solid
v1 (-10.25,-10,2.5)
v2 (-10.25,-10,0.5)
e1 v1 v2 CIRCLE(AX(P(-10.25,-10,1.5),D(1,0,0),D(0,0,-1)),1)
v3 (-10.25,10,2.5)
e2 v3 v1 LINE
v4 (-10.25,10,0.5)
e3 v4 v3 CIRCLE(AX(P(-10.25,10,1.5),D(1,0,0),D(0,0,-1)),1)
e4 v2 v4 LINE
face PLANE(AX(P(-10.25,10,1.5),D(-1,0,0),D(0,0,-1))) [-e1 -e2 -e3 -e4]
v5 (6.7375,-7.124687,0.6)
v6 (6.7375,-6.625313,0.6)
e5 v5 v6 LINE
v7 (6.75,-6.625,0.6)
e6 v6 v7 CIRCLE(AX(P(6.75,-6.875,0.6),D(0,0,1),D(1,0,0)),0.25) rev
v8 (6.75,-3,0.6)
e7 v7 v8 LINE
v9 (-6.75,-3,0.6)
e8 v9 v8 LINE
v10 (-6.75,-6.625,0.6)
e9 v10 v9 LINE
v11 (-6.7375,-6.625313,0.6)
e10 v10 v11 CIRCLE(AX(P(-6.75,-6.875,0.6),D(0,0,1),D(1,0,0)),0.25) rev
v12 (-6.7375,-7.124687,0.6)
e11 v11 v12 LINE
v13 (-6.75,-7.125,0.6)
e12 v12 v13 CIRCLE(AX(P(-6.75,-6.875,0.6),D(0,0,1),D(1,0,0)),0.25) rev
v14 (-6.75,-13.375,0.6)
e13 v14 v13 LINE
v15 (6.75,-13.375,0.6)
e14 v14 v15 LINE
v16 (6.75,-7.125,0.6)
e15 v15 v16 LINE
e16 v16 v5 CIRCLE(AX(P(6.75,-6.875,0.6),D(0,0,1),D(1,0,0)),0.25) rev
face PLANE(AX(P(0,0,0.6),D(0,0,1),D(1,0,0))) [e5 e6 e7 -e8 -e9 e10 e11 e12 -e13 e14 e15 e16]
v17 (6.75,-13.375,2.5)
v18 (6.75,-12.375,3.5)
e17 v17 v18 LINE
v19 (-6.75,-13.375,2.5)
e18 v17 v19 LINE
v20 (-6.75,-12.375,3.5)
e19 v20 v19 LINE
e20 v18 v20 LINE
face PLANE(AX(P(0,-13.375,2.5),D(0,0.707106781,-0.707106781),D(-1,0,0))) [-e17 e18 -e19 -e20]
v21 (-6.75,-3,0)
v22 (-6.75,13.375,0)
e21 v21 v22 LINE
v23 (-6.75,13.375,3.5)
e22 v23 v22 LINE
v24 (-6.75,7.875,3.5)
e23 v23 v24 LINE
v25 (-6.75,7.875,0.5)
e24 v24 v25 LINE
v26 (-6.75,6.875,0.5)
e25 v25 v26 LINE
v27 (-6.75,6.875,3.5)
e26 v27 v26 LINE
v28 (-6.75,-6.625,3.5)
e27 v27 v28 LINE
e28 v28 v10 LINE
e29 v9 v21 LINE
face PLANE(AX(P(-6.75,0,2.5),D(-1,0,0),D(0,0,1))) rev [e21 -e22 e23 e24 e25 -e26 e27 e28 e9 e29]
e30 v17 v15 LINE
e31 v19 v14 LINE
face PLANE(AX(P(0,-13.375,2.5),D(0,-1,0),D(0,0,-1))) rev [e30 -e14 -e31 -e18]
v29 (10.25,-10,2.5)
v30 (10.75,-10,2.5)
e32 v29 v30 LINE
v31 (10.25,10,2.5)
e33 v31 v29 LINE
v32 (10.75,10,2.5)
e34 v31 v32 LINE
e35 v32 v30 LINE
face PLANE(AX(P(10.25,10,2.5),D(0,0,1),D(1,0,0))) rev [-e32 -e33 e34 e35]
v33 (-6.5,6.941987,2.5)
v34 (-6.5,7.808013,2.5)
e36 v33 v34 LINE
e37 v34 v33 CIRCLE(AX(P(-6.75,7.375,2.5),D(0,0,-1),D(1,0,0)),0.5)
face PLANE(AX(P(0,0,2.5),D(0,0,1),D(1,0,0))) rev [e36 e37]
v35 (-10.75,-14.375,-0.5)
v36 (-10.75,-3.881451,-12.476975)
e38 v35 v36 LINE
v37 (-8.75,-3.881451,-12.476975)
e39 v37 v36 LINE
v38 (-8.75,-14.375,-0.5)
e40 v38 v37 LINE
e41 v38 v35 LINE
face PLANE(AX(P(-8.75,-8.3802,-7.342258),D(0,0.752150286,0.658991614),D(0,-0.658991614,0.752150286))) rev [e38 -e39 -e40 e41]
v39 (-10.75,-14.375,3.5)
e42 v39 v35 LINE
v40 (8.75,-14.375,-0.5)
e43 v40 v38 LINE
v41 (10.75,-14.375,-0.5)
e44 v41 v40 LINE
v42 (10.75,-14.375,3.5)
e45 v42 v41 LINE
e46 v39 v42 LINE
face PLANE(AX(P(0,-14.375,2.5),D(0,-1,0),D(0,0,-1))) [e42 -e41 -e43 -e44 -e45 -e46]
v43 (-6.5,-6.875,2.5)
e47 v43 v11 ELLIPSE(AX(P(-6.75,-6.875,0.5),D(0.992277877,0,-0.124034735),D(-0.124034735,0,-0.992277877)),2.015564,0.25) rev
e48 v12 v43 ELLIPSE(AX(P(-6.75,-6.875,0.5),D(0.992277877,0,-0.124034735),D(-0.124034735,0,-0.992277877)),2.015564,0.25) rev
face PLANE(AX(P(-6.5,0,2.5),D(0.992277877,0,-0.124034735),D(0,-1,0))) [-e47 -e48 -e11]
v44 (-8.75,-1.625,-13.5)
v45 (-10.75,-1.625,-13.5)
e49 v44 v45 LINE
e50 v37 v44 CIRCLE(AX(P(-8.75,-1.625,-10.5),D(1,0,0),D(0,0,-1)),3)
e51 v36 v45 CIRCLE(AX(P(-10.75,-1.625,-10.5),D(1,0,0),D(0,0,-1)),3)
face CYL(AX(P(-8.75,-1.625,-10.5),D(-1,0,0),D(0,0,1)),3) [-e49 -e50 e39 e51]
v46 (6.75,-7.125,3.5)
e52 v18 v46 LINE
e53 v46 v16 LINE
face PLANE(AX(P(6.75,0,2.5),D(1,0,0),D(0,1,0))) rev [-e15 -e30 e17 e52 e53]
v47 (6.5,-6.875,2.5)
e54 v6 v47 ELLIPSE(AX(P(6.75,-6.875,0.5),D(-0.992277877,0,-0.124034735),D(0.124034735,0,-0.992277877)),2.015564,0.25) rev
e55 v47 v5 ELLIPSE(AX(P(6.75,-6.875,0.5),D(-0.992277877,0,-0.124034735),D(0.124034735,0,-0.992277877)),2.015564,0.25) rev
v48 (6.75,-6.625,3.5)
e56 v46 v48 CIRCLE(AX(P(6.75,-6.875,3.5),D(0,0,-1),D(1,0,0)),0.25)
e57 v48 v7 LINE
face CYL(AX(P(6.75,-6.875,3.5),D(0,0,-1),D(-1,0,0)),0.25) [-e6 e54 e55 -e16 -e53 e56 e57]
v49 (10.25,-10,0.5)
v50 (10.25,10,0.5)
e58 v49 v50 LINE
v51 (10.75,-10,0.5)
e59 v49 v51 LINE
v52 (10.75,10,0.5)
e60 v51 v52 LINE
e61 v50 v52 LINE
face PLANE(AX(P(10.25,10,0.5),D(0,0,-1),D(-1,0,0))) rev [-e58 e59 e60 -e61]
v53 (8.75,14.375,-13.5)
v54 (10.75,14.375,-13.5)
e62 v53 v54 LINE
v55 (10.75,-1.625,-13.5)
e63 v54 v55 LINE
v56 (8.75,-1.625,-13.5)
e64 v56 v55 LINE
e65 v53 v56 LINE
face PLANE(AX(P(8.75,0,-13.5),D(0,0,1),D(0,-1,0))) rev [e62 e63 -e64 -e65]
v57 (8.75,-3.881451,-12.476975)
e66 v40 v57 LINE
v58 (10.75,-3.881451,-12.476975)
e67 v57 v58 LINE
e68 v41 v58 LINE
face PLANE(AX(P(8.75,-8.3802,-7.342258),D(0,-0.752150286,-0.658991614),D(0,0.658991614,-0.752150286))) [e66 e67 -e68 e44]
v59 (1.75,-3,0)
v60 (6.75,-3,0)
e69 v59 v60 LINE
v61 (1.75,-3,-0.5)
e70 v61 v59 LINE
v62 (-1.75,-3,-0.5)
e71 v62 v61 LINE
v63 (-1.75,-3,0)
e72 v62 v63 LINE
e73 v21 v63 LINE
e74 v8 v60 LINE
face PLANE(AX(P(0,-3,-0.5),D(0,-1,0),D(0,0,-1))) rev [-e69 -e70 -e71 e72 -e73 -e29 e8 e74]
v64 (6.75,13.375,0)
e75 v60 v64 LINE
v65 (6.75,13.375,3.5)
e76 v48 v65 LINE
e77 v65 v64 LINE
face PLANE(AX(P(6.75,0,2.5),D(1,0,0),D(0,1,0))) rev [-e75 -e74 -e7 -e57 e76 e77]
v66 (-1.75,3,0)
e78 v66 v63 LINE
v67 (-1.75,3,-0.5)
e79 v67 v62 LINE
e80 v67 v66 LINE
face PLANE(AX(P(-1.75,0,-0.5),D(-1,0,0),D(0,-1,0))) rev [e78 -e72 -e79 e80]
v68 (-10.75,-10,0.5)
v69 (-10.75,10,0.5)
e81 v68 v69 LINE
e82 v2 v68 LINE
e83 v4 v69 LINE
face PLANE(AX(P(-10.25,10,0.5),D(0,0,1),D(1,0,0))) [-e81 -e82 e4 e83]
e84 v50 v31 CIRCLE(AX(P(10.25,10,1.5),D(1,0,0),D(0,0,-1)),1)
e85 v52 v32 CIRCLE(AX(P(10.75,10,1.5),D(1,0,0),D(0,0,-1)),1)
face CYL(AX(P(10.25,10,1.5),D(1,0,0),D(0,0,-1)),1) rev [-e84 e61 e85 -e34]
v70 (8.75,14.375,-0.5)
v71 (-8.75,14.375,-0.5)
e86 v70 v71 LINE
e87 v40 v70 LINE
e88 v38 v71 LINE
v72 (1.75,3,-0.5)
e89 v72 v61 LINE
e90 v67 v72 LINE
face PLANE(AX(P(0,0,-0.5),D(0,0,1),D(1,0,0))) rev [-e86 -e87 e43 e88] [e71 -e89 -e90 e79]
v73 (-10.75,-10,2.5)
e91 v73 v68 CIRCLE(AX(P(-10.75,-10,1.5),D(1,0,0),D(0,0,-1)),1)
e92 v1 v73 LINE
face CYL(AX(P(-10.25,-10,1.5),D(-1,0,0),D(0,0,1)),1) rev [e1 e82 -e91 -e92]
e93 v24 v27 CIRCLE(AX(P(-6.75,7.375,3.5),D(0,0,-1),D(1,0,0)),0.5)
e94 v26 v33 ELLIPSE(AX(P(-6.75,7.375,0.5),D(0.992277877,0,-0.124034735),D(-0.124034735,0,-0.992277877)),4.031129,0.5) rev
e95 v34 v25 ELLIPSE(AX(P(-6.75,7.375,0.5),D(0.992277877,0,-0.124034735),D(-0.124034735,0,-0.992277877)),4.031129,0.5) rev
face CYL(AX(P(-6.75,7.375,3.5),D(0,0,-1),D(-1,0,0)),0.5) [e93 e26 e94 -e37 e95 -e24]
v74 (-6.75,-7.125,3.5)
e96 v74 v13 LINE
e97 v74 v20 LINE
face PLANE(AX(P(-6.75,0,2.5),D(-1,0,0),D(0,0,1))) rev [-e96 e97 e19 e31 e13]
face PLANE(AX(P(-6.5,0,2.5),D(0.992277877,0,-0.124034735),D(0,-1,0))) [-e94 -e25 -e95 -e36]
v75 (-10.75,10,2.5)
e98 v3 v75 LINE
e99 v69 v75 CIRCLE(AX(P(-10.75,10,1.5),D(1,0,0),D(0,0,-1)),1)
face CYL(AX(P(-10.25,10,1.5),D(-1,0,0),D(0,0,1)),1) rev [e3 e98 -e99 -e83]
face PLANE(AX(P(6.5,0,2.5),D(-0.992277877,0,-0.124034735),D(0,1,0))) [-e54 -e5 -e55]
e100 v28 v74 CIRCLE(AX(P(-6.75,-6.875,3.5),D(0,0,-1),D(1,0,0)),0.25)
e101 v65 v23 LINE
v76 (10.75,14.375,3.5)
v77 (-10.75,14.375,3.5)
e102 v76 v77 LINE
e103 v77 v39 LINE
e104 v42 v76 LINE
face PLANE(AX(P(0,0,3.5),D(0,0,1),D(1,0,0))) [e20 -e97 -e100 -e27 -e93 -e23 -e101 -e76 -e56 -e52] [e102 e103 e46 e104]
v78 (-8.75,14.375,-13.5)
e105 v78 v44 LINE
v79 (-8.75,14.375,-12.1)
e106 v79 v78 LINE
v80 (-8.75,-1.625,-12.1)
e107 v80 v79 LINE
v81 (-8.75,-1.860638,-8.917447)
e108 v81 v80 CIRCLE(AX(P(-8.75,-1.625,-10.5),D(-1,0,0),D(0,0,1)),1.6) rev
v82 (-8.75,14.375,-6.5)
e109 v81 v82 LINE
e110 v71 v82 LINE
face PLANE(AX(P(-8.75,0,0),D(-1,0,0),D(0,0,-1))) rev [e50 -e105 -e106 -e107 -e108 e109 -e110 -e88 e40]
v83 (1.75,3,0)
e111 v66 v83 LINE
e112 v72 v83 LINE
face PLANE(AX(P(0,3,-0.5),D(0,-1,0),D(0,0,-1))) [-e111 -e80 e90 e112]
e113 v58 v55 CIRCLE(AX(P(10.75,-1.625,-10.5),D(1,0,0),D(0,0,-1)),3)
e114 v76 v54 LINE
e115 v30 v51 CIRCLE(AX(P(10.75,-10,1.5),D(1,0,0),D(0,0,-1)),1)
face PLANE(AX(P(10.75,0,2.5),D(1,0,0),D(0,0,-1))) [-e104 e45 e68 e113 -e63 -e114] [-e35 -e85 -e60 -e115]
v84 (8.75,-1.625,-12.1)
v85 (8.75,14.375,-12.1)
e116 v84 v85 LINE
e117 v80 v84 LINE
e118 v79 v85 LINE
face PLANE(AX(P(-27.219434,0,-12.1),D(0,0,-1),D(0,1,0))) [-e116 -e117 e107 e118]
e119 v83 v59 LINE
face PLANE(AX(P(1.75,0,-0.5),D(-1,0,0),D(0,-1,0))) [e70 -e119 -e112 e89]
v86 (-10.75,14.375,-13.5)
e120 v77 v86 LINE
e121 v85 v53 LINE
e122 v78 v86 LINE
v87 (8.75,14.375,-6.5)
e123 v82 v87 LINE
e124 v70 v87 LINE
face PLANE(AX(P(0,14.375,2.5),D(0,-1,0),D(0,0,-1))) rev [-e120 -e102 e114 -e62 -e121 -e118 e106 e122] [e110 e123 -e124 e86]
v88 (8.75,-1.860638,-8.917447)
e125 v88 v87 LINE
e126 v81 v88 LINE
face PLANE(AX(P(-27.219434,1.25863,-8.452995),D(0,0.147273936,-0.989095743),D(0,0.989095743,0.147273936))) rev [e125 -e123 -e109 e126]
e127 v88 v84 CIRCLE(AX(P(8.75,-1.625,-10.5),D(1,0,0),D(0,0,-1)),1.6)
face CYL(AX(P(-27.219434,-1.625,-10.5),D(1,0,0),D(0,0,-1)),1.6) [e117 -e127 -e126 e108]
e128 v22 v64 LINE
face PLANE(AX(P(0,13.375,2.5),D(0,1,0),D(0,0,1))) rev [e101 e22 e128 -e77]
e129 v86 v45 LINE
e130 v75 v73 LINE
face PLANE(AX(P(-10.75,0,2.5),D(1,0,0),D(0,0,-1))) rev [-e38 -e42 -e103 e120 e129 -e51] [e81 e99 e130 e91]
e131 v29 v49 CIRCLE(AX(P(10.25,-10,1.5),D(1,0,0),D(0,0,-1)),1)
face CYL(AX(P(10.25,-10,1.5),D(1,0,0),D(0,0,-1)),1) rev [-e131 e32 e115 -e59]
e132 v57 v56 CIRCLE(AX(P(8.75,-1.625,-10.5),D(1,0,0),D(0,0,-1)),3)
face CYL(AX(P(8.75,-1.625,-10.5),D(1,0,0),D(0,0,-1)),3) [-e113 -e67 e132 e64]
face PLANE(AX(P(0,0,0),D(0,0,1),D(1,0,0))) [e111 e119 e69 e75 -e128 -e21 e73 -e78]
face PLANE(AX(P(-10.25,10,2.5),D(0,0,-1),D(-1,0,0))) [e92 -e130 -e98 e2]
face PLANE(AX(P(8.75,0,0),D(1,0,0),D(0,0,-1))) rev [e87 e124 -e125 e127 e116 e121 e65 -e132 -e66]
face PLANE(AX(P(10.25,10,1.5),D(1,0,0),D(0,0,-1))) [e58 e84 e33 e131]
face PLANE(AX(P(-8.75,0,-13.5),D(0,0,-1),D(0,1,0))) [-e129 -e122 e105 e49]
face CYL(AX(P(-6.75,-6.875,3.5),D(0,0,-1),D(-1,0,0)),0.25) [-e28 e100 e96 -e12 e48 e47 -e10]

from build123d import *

# Parameters (mm, degrees)
BOSS_EXTRUDE2_DEPTH = 0.5
BOSS_EXTRUDE3_DEPTH = 0.6
SKETCH4_W           = 21.5
SKETCH4_H           = 28.75
SKETCH4_W_2         = 13.5
SKETCH4_H_2         = 26.75
BOSS_EXTRUDE4_DEPTH = 3
SKETCH5_W           = 21.5
SKETCH5_H           = 28.75
BOSS_EXTRUDE5_DEPTH = 1
CHAMFER1_SIZE       = 0.25
CHAMFER1_SIZE_2     = 2
CHAMFER2_SIZE       = 2
CUT_EXTRUDE3_DEPTH  = 0.5
BOSS_EXTRUDE6_DEPTH = 2
BOSS_EXTRUDE8_START = -2
BOSS_EXTRUDE8_DEPTH = 17.5


with BuildPart() as part:
    # Sketch2 → Boss-Extrude2 (new body)
    with BuildSketch(Plane.XY):
        Polygon((-6.75, 13.375), (-6.75, -3), (-1.75, -3), (-1.75, 3), (1.75, 3), (1.75, -3), (6.75, -3), (6.75, 13.375), align=None)
        Polygon((-6.75, -3), (-6.75, -13.375), (6.75, -13.375), (6.75, -3), (1.75, -3), (-1.75, -3), align=None)
    extrude(amount=-BOSS_EXTRUDE2_DEPTH)

    # Sketch2<5> → Boss-Extrude3 (add)
    with BuildSketch(Plane.XY):
        Polygon((-6.75, -3), (-6.75, -13.375), (6.75, -13.375), (6.75, -3), (1.75, -3), (-1.75, -3), align=None)
    extrude(amount=BOSS_EXTRUDE3_DEPTH)

    # Sketch4 → Boss-Extrude4 (add)
    with BuildSketch(Plane(origin=(0, 0, -0.5), x_dir=(-1, 0, 0), z_dir=(0, 0, -1))):
        Rectangle(SKETCH4_W, SKETCH4_H)
        Rectangle(SKETCH4_W_2, SKETCH4_H_2, mode=Mode.SUBTRACT)
    extrude(amount=-BOSS_EXTRUDE4_DEPTH)

    # Sketch5 → Boss-Extrude5 (add)
    with BuildSketch(Plane.XY.offset(2.5)):
        Rectangle(SKETCH5_W, SKETCH5_H)
        with BuildLine():
            Line((-6.75, -7.125), (-6.75, -11.375))
            Line((-6.75, -11.375), (6.75, -11.375))
            Line((6.75, -11.375), (6.75, -7.125))
            ThreePointArc((6.75, -7.125), (6.5, -6.875), (6.75, -6.625))
            Line((6.75, -6.625), (6.75, 13.375))
            Line((6.75, 13.375), (-6.75, 13.375))
            Line((-6.75, 13.375), (-6.75, 7.875))
            ThreePointArc((-6.75, 7.875), (-6.25, 7.375), (-6.75, 6.875))
            Line((-6.75, 6.875), (-6.75, -6.625))
            ThreePointArc((-6.75, -6.625), (-6.5, -6.875), (-6.75, -7.125))
        make_face(mode=Mode.SUBTRACT)
    extrude(amount=BOSS_EXTRUDE5_DEPTH)

    # Chamfer1
    # the kernel refuses this chamfer: 2, 0.25 mm, written as the material it adds along each edge
    with BuildSketch(Plane(origin=(6.75, -1.426485236, 2.5), x_dir=(-0.9563912737708581, 0, 0.29208856782653414), z_dir=(0, -1, 0))) as chamfer1_piece_1_section:
        Polygon((CHAMFER1_SIZE * 0.956391273771, CHAMFER1_SIZE * 0.292088567827), (-CHAMFER1_SIZE_2 * 0.292088567827, CHAMFER1_SIZE_2 * 0.956391273771), (0, 0), align=None)
    chamfer1_piece_1 = extrude(amount=10.897029528, mode=Mode.PRIVATE)
    chamfer1_piece_1 = chamfer1_piece_1 & Plane(origin=(6.75, -6.875, 1.806445447), x_dir=(0, -1, 0), z_dir=(0, 0, -1)) * Cylinder(0.25, 30, mode=Mode.PRIVATE)
    add(chamfer1_piece_1)
    with BuildSketch(Plane(origin=(-6.75, -12.323514764, 2.5), x_dir=(-0.0047719296843702665, 0, -0.9999886142787264), z_dir=(0, 1, 0))) as chamfer1_piece_2_section:
        Polygon((CHAMFER1_SIZE_2 * 0.999988614279, -CHAMFER1_SIZE_2 * 0.00477192968437), (-CHAMFER1_SIZE * 0.00477192968437, -CHAMFER1_SIZE * 0.999988614279), (0, 0), align=None)
    chamfer1_piece_2 = extrude(amount=10.897029528, mode=Mode.PRIVATE)
    chamfer1_piece_2 = chamfer1_piece_2 & Plane(origin=(-6.75, -6.875, 1.806445447), x_dir=(0, 1, 0), z_dir=(0, 0, -1)) * Cylinder(0.25, 30, mode=Mode.PRIVATE)
    add(chamfer1_piece_2)
    with BuildSketch(Plane(origin=(-6.75, 1.676485236, 2.5), x_dir=(0.9563912737708581, 0, 0.29208856782653414), z_dir=(0, 1, 0))) as chamfer1_piece_3_section:
        Polygon((CHAMFER1_SIZE * 0.956391273771, CHAMFER1_SIZE * 0.292088567827), (-CHAMFER1_SIZE_2 * 0.292088567827, CHAMFER1_SIZE_2 * 0.956391273771), (0, 0), align=None)
    chamfer1_piece_3 = extrude(amount=11.397029528, mode=Mode.PRIVATE)
    chamfer1_piece_3 = chamfer1_piece_3 & Plane(origin=(-6.75, 7.375, 1.827435812), x_dir=(0, 1, 0), z_dir=(0, 0, -1)) * Cylinder(0.5, 31, mode=Mode.PRIVATE)
    add(chamfer1_piece_3)

    # Chamfer2
    # the kernel refuses this chamfer: 2 mm, written as the material it takes off along each edge
    with BuildSketch(Plane(origin=(-6.75, -11.375, 2.5), x_dir=(0, -0.9996219169112968, -0.02749587661058627), z_dir=(1, 0, 0))) as chamfer2_piece_1_section:
        Polygon((CHAMFER2_SIZE * 0.999621916911, -CHAMFER2_SIZE * 0.0274958766106), (-CHAMFER2_SIZE * 0.0274958766106, -CHAMFER2_SIZE * 0.999621916911), (0, 0), align=None)
    chamfer2_piece_1 = extrude(amount=13.5, mode=Mode.PRIVATE)
    chamfer2_piece_1 = split(chamfer2_piece_1, bisect_by=Plane(origin=(0, -13.375, 3.160808309), z_dir=(0, 1, 0)), keep=Keep.TOP, mode=Mode.PRIVATE)
    add(chamfer2_piece_1, mode=Mode.SUBTRACT)

    # Sketch7 → Cut-Extrude3 (cut)
    with BuildSketch(Plane(origin=(10.75, 0, 0), x_dir=(0, 0, -1), z_dir=(1, 0, 0))):
        with BuildLine():
            Line((-0.5, 10), (-0.5, -10))
            ThreePointArc((-0.5, -10), (-1.5, -11), (-2.5, -10))
            Line((-2.5, -10), (-2.5, 10))
            ThreePointArc((-2.5, 10), (-1.5, 11), (-0.5, 10))
        make_face()
    cut_extrude3 = extrude(amount=-CUT_EXTRUDE3_DEPTH, mode=Mode.SUBTRACT)

    # Sketch8 → Boss-Extrude6 (add)
    with BuildSketch(Plane(origin=(10.75, 0, 0), x_dir=(0, 0, -1), z_dir=(1, 0, 0))):
        with BuildLine():
            Line((0.5, 14.375), (0.5, -14.375))
            Line((0.5, -14.375), (12.476974843, -3.881450857))
            ThreePointArc((12.476974843, -3.881450857), (13.232299812, -2.863764601), (13.5, -1.625))
            Line((13.5, -1.625), (13.5, 14.375))
            Line((13.5, 14.375), (0.5, 14.375))
        make_face()
    boss_extrude6 = extrude(amount=-BOSS_EXTRUDE6_DEPTH)

    # Mirror1: Cut-Extrude3, Boss-Extrude6 across plane
    add(cut_extrude3.mirror(Plane(origin=(0, 0, 0), x_dir=(0, 0, 1), z_dir=(1, 0, 0))), mode=Mode.SUBTRACT)
    add(boss_extrude6.mirror(Plane(origin=(0, 0, 0), x_dir=(0, 0, 1), z_dir=(1, 0, 0))))

    # Sketch8<3> → Boss-Extrude8 (add)
    with BuildSketch(Plane(origin=(10.75, 0, 0), x_dir=(0, 0, -1), z_dir=(1, 0, 0)).offset(BOSS_EXTRUDE8_START)):
        with BuildLine():
            Line((12.1, 14.375), (6.5, 14.375))
            Line((6.5, 14.375), (8.917446812, -1.860638297))
            ThreePointArc((8.917446812, -1.860638297), (10.61814165, -3.220632336), (12.1, -1.625))
            Line((12.1, -1.625), (12.1, 14.375))
        make_face()
    extrude(amount=-BOSS_EXTRUDE8_DEPTH)


solid = part.part
